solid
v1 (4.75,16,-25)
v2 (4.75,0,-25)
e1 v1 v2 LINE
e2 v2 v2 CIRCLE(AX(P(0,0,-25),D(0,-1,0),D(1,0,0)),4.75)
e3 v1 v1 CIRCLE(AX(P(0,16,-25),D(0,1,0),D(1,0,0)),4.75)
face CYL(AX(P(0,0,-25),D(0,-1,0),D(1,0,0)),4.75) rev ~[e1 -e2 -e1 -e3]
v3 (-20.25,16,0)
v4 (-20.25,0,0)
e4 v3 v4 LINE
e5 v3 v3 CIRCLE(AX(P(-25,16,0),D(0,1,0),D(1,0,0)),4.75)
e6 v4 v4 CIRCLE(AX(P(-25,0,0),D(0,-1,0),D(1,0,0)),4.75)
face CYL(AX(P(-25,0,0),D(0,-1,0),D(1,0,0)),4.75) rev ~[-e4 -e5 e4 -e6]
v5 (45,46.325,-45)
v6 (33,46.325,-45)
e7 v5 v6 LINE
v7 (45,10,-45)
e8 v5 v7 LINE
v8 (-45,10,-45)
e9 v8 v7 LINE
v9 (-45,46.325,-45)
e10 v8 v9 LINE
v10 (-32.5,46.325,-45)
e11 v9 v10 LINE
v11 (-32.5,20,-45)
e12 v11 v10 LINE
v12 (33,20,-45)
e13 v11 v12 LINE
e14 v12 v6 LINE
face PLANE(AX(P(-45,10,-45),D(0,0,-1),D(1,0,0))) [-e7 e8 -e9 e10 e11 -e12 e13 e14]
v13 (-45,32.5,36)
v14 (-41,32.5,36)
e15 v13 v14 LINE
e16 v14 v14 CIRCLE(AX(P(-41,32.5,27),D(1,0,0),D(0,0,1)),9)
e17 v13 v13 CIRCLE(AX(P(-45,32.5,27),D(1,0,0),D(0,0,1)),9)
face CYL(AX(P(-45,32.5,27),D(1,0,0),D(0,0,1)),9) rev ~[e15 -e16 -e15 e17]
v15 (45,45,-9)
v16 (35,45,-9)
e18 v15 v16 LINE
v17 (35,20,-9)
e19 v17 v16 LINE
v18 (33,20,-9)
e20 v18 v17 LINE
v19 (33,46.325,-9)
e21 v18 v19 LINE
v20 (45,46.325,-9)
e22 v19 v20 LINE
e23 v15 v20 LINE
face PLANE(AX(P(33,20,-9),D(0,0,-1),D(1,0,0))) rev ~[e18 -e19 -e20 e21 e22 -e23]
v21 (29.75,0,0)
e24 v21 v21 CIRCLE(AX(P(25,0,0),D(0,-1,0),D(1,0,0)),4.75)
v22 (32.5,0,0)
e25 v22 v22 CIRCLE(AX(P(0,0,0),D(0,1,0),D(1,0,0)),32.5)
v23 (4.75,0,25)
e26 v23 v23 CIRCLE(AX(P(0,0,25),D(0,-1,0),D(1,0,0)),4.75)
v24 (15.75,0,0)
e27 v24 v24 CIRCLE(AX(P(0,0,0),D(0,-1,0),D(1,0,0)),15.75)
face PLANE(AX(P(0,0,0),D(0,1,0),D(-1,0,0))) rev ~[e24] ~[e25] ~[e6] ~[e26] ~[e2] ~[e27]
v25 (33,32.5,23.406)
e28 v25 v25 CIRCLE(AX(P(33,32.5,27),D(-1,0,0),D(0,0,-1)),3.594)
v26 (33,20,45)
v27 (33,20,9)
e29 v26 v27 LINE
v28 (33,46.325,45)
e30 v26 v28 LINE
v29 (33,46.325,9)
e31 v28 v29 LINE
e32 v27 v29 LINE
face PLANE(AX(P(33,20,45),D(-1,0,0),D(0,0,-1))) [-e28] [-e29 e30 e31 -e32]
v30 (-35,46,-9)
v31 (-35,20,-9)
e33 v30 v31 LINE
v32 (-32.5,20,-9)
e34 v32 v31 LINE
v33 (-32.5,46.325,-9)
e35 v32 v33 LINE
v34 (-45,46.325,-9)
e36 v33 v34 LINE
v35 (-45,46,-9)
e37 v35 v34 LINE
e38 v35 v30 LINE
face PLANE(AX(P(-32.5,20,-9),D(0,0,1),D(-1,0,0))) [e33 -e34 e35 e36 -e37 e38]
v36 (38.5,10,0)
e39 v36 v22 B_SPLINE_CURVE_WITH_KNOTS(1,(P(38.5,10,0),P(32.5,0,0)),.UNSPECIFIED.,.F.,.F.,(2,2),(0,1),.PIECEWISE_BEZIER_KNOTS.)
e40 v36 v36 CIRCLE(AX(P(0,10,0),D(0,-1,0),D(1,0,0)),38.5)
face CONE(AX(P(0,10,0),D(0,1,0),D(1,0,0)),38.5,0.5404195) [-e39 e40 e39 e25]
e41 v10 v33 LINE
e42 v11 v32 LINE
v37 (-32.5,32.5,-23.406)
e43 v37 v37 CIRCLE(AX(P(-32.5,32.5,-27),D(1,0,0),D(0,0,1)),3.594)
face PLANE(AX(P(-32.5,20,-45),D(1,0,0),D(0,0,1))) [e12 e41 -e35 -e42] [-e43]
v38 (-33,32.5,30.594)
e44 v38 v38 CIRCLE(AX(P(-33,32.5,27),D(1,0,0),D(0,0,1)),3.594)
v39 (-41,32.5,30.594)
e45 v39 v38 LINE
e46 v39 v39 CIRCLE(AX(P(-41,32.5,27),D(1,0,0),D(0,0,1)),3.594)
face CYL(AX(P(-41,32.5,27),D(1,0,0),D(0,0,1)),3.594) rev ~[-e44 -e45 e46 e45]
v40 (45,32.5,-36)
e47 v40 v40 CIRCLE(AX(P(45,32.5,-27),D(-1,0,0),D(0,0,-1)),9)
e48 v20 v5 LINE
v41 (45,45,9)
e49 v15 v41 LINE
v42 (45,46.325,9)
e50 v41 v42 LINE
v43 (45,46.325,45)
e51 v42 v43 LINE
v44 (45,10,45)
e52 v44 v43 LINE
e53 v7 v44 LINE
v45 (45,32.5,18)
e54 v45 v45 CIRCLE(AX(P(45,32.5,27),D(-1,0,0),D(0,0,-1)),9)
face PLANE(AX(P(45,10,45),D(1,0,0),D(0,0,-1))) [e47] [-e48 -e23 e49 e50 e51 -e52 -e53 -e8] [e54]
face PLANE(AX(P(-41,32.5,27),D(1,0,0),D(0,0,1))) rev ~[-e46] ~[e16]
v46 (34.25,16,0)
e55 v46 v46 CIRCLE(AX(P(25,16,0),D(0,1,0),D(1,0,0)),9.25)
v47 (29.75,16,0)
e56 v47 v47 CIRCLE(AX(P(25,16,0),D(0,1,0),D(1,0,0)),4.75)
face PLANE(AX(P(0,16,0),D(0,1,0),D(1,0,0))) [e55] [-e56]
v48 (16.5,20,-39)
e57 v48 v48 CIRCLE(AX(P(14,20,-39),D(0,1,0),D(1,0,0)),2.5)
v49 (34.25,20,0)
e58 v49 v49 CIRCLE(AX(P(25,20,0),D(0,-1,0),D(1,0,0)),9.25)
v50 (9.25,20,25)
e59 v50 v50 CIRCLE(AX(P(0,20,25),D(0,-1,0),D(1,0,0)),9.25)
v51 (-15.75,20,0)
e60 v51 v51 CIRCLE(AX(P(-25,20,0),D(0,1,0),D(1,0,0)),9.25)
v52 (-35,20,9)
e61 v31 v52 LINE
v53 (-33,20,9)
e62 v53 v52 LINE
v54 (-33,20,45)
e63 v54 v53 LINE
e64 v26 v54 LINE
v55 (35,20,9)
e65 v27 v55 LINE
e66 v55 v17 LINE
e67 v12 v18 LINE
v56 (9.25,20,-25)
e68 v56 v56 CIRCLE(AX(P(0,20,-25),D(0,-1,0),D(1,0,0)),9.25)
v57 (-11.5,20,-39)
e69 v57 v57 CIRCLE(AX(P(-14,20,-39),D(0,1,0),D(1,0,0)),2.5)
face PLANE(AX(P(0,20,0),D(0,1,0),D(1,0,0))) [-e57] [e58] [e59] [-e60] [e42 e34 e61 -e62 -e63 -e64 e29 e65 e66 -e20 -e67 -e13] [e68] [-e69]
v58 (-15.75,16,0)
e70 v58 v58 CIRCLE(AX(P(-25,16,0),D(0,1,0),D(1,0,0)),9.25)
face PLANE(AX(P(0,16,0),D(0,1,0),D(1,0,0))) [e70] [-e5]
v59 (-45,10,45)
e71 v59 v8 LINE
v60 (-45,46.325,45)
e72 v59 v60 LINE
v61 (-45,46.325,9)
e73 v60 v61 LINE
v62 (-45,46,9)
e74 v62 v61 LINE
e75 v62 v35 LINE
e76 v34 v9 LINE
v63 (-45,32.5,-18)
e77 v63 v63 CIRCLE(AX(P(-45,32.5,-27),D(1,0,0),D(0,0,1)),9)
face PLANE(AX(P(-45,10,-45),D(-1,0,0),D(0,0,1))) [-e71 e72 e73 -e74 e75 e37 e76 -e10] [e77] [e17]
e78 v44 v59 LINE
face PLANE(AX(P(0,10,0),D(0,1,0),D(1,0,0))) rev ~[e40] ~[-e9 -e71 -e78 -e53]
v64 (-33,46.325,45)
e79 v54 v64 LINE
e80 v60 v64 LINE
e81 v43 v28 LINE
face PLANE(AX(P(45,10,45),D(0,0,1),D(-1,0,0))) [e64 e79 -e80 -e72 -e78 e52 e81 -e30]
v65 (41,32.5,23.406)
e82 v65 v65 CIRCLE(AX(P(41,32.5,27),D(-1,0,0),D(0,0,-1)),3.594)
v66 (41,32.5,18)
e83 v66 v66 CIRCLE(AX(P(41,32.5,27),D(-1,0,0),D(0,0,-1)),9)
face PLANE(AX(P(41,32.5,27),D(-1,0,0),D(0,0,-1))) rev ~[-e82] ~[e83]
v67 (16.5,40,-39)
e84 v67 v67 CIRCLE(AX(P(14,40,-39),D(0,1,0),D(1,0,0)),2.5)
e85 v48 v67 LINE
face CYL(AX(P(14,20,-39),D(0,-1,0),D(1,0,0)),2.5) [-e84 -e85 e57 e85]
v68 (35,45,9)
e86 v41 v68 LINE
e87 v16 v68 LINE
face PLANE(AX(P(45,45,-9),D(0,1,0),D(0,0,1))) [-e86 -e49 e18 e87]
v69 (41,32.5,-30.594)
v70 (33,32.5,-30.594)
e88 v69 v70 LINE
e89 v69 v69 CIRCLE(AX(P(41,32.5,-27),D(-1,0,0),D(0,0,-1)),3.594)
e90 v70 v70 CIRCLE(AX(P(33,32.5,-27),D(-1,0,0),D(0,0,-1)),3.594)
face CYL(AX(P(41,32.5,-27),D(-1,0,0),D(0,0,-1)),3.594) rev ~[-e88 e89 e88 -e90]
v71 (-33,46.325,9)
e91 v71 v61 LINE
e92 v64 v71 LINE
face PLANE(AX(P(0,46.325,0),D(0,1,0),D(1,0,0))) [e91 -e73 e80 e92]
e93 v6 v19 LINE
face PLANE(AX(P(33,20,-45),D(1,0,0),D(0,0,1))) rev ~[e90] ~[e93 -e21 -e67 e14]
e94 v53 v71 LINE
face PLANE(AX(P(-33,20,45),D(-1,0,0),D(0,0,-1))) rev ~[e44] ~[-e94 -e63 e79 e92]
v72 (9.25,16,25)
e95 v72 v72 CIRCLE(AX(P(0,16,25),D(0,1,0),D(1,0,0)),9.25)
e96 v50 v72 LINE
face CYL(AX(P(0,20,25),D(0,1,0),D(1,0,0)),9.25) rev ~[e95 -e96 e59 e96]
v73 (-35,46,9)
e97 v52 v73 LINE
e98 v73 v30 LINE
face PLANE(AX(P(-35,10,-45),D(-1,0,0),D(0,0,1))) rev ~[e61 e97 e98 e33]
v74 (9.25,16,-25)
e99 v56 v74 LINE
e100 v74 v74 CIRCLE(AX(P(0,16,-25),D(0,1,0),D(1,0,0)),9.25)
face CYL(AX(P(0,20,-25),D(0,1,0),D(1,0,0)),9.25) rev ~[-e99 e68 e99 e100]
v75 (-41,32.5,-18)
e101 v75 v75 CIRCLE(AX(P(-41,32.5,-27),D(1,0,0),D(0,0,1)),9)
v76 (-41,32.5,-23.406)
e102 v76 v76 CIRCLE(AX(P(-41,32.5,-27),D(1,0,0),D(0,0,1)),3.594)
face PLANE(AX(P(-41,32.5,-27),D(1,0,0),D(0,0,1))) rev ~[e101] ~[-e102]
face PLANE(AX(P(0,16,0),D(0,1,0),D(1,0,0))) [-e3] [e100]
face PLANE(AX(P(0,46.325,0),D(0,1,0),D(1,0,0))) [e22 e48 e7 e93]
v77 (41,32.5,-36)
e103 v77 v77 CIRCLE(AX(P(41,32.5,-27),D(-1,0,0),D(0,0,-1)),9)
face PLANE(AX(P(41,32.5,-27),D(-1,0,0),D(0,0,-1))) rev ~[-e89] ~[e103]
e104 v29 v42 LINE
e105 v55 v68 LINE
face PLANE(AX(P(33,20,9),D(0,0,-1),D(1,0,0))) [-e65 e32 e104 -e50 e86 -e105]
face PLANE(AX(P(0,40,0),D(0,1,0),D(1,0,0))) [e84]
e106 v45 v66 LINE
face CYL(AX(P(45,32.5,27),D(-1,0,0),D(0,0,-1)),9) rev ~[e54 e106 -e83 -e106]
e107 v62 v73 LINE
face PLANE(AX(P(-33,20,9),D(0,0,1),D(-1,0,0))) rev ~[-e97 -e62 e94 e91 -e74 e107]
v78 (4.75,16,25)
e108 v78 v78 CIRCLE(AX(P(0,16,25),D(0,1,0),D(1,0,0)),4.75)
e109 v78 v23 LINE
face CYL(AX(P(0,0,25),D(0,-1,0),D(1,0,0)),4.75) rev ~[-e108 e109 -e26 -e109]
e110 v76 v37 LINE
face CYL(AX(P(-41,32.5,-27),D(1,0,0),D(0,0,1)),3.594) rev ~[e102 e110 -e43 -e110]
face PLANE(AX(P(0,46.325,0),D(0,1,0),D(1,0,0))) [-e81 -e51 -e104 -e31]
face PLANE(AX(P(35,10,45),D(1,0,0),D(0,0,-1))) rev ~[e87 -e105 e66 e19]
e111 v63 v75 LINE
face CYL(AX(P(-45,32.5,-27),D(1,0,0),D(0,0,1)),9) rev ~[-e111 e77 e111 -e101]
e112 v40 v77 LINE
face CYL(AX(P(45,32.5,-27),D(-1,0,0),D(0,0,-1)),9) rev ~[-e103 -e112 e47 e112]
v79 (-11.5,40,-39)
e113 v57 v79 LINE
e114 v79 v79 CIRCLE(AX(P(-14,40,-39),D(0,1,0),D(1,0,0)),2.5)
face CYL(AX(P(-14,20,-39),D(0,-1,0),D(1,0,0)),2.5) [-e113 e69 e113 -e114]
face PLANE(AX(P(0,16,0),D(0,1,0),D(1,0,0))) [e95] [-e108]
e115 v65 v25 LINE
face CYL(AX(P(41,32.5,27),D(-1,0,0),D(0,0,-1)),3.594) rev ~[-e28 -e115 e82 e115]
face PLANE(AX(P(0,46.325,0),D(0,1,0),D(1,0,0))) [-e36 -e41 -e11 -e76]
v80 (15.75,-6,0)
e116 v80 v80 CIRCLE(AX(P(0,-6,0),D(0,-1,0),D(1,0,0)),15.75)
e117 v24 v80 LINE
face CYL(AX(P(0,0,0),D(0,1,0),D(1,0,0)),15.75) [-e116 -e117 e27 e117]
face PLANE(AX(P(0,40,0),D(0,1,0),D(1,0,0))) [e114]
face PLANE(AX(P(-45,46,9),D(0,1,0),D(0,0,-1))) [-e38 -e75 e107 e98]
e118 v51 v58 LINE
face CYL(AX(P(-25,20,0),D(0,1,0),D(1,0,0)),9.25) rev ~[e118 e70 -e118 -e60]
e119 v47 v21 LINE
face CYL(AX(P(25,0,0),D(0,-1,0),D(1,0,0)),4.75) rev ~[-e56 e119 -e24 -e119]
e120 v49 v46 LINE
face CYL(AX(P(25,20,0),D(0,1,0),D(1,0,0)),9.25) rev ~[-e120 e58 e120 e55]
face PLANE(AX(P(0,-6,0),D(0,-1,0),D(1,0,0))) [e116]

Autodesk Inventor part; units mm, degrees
ref_plane "YZ Plane" through (0, 0, 0) normal (1, 0, 0) x (0, 1, 0)
ref_plane "XZ Plane" through (0, 0, 0) normal (0, 1, 0) x (-1, 0, 0)
ref_plane "XY Plane" through (0, 0, 0) normal (0, 0, 1) x (1, 0, 0)
sketch "Szkic1" plane through (0, 0, 0) normal (0, 1, 0) x (-1, 0, 0)
  circle A0 centre (0, 0) radius 32.5
  dimension "d0" = 65
extrude "Wyciągnięcie proste1" add sketch "Szkic1" along normal blind 10
sketch "Szkic2" plane through (0, 10, 0) normal (0, 1, 0) x (1, 0, 0)
  circle A0 centre (0, 0) radius 15.75
  circle A1 centre (0, 25) radius 4.75
  circle A2 centre (-25, 0) radius 4.75
  circle A3 centre (0, -25) radius 4.75
  circle A4 centre (25, 0) radius 4.75
  dimension "d3" = 31.5
  dimension "d4" = 9.5
  dimension "d5" = 25
  dimension "d8" = 360
extrude "Wyciągnięcie proste2" cut sketch "Szkic2" against normal blind 23.25 contours A1 | A2 | A3 | A4
sketch "Szkic3" plane through (0, 0, 0) normal (0, -1, 0) x (1, 0, 0)
  circle A0 centre (0, 0) radius 15.75
  dimension "d12" = 31.5
extrude "Wyciągnięcie proste3" add sketch "Szkic3" along normal blind 6
sketch "Szkic4" plane through (0, 10, 0) normal (0, 1, 0) x (1, 0, 0)
  line L0 (-45, 45) -> (45, 45)
  line L1 (45, 45) -> (45, -45)
  line L2 (45, -45) -> (-45, -45)
  line L3 (-45, -45) -> (-45, 45)
  point P0 (0, 0)
  point P1 (0, 45)
  point P2 (45, 0)
  dimension "d15" = 90
  dimension "d16" = 90
extrude "Wyciągnięcie proste4" add sketch "Szkic4" along normal blind 10
sketch "Szkic5" plane through (0, 10, 0) normal (0, -1, 0) x (1, 0, 0)
  circle A0 centre (-25, 0) radius 4.75 projected
  circle A1 centre (0, 25) radius 4.75 projected
  circle A2 centre (25, 0) radius 4.75 projected
  circle A3 centre (0, -25) radius 4.75 projected
  point P0 (0, 0)
extrude "Wyciągnięcie proste5" cut sketch "Szkic5" along normal mid plane 50
sketch "Szkic6" plane through (0, 20, 0) normal (0, 1, 0) x (1, 0, 0)
  circle A0 centre (0, 25) radius 4.75 projected
  circle A1 centre (25, 0) radius 4.75 projected
  circle A2 centre (-25, 0) radius 4.75 projected
  circle A3 centre (0, -25) radius 4.75 projected
  circle A4 centre (-25, 0) radius 9.25
  circle A5 centre (0, 0) radius 15.75 projected
  circle A6 centre (0, 25) radius 9.25
  circle A7 centre (25, 0) radius 4.75 projected
  circle A8 centre (25, 0) radius 9.25
  circle A9 centre (0, -25) radius 9.25
extrude "Wyciągnięcie proste6" cut sketch "Szkic6" against normal blind 4 contours A4 | A6 | A8 | A9
sketch "Szkic7" plane through (0, 10, 0) normal (0, -1, 0) x (1, 0, 0)
  circle A0 centre (0, 0) radius 38.5
  dimension "d29" = 77
sketch "Szkic8" plane through (0, 0, 0) normal (0, -1, 0) x (1, 0, 0)
  circle A0 centre (0, 0) radius 32.5
loft "Wyciągnięcie złożone1" add profiles "Szkic7" section 2 edges at (32.5, 0, 0)
sketch "Szkic9" plane through (0, 0, 0) normal (0, -1, 0) x (1, 0, 0)
  circle A0 centre (0, -25) radius 4.75 projected
  circle A1 centre (-25, 0) radius 4.75 projected
  circle A2 centre (0, 25) radius 4.75 projected
  circle A3 centre (25, 0) radius 4.75 projected
  point P0 (0, 0)
extrude "Wyciągnięcie proste7" cut sketch "Szkic9" against normal blind 30
sketch "Szkic10" plane through (0, 20, 0) normal (0, 1, 0) x (1, 0, 0)
  line L0 (-45, -45) -> (-45, 45) projected
  line L1 (-45, -45) -> (-33, -45)
  line L2 (-33, -45) -> (-33, -9)
  line L3 (-33, -9) -> (-45, -9)
  line L4 (-45, -9) -> (-45, -45)
  line L5 (-45, 45) -> (-32.5, 45)
  line L6 (-32.5, 45) -> (-32.5, 9)
  line L7 (-32.5, 9) -> (-45, 9)
  line L8 (-45, 9) -> (-45, 45)
  line L9 (45, -45) -> (-45, -45) projected
  line L10 (45, -45) -> (33, -45)
  line L11 (33, -45) -> (33, -9)
  line L12 (33, -9) -> (45, -9)
  line L13 (45, -9) -> (45, -45)
  line L14 (45, 45) -> (33, 45)
  line L15 (33, 45) -> (33, 9)
  line L16 (33, 9) -> (45, 9)
  line L17 (45, 9) -> (45, 45)
  point P0 (0, 0)
  dimension "d30" = 12
  dimension "d31" = 36
extrude "Wyciągnięcie proste8" add sketch "Szkic10" along normal blind 26.325
sketch "Szkic11" plane through (45, 10, 45) normal (1, 0, 0) x (0, 0, -1)
  circle A0 centre (18, 22.5) radius 5
  circle A1 centre (72, 22.5) radius 5
  point P0 (45, -10)
  dimension "d34" = 10
  dimension "d35" = 10
sketch "Szkic12" plane through (-45, 10, -45) normal (-1, 0, 0) x (0, 0, 1)
  circle A0 centre (18, 22.5) radius 5
  circle A1 centre (72, 22.5) radius 5
  point P0 (45, -10)
  dimension "d36" = 10
  dimension "d37" = 10
sketch "Szkic13" plane through (-45, 10, -45) normal (-1, 0, 0) x (0, 0, 1)
  point P0 (45, -10)
sketch "Szkic14" plane through (-45, 10, -45) normal (-1, 0, 0) x (0, 0, 1)
  line L0 (36, 10) -> (54, 10) projected
  line L1 (36, 10) -> (54, 10)
  line L2 (54, 10) -> (54, 36)
  line L3 (54, 36) -> (36, 36)
  line L4 (36, 36) -> (36, 10)
  point P0 (45, -10)
extrude "Wyciągnięcie proste9" add sketch "Szkic14" against normal blind 10
sketch "Szkic15" plane through (45, 10, 45) normal (1, 0, 0) x (0, 0, -1)
  line L0 (36, 10) -> (36, 36.325) projected
  line L1 (54, 10) -> (54, 36.325) projected
  line L2 (36, 10) -> (54, 10)
  line L3 (54, 10) -> (54, 35)
  line L4 (54, 35) -> (36, 35)
  line L5 (36, 35) -> (36, 10)
  point P0 (45, -10)
extrude "Wyciągnięcie proste10" add sketch "Szkic15" against normal blind 10
hole "Otwór1" at (45, 32.5, 27) at (45, 32.5, -27) direction (-1, 0, 0) diameter 7.188 depth 24 tip angle 118 counterbore diameter 18 counterbore depth 4 thread size "M8x0.75" class "6H" standard "ISO Metric profile"
hole "Otwór2" at (-45, 32.5, -27) at (-45, 32.5, 27) direction (1, 0, 0) diameter 7.188 depth 20 tip angle 118 counterbore diameter 18 counterbore depth 4 thread size "M8x0.75" class "6H" standard "ISO Metric profile"
sketch "Szkic16" plane through (0, 20, 0) normal (0, 1, 0) x (1, 0, 0)
  circle A0 centre (14, 39) radius 2.5
  circle A1 centre (-14, 39) radius 2.5
  point P0 (0, 0)
  dimension "d56" = 5
  dimension "d57" = 5
extrude "Wyciągnięcie proste11" add sketch "Szkic16" along normal blind 20
sketch "Szkic17" plane through (0, 20, 0) normal (0, 1, 0) x (1, 0, 0)
  point P0 (0, 0)
properties part number "polaczenie_CH-R"
